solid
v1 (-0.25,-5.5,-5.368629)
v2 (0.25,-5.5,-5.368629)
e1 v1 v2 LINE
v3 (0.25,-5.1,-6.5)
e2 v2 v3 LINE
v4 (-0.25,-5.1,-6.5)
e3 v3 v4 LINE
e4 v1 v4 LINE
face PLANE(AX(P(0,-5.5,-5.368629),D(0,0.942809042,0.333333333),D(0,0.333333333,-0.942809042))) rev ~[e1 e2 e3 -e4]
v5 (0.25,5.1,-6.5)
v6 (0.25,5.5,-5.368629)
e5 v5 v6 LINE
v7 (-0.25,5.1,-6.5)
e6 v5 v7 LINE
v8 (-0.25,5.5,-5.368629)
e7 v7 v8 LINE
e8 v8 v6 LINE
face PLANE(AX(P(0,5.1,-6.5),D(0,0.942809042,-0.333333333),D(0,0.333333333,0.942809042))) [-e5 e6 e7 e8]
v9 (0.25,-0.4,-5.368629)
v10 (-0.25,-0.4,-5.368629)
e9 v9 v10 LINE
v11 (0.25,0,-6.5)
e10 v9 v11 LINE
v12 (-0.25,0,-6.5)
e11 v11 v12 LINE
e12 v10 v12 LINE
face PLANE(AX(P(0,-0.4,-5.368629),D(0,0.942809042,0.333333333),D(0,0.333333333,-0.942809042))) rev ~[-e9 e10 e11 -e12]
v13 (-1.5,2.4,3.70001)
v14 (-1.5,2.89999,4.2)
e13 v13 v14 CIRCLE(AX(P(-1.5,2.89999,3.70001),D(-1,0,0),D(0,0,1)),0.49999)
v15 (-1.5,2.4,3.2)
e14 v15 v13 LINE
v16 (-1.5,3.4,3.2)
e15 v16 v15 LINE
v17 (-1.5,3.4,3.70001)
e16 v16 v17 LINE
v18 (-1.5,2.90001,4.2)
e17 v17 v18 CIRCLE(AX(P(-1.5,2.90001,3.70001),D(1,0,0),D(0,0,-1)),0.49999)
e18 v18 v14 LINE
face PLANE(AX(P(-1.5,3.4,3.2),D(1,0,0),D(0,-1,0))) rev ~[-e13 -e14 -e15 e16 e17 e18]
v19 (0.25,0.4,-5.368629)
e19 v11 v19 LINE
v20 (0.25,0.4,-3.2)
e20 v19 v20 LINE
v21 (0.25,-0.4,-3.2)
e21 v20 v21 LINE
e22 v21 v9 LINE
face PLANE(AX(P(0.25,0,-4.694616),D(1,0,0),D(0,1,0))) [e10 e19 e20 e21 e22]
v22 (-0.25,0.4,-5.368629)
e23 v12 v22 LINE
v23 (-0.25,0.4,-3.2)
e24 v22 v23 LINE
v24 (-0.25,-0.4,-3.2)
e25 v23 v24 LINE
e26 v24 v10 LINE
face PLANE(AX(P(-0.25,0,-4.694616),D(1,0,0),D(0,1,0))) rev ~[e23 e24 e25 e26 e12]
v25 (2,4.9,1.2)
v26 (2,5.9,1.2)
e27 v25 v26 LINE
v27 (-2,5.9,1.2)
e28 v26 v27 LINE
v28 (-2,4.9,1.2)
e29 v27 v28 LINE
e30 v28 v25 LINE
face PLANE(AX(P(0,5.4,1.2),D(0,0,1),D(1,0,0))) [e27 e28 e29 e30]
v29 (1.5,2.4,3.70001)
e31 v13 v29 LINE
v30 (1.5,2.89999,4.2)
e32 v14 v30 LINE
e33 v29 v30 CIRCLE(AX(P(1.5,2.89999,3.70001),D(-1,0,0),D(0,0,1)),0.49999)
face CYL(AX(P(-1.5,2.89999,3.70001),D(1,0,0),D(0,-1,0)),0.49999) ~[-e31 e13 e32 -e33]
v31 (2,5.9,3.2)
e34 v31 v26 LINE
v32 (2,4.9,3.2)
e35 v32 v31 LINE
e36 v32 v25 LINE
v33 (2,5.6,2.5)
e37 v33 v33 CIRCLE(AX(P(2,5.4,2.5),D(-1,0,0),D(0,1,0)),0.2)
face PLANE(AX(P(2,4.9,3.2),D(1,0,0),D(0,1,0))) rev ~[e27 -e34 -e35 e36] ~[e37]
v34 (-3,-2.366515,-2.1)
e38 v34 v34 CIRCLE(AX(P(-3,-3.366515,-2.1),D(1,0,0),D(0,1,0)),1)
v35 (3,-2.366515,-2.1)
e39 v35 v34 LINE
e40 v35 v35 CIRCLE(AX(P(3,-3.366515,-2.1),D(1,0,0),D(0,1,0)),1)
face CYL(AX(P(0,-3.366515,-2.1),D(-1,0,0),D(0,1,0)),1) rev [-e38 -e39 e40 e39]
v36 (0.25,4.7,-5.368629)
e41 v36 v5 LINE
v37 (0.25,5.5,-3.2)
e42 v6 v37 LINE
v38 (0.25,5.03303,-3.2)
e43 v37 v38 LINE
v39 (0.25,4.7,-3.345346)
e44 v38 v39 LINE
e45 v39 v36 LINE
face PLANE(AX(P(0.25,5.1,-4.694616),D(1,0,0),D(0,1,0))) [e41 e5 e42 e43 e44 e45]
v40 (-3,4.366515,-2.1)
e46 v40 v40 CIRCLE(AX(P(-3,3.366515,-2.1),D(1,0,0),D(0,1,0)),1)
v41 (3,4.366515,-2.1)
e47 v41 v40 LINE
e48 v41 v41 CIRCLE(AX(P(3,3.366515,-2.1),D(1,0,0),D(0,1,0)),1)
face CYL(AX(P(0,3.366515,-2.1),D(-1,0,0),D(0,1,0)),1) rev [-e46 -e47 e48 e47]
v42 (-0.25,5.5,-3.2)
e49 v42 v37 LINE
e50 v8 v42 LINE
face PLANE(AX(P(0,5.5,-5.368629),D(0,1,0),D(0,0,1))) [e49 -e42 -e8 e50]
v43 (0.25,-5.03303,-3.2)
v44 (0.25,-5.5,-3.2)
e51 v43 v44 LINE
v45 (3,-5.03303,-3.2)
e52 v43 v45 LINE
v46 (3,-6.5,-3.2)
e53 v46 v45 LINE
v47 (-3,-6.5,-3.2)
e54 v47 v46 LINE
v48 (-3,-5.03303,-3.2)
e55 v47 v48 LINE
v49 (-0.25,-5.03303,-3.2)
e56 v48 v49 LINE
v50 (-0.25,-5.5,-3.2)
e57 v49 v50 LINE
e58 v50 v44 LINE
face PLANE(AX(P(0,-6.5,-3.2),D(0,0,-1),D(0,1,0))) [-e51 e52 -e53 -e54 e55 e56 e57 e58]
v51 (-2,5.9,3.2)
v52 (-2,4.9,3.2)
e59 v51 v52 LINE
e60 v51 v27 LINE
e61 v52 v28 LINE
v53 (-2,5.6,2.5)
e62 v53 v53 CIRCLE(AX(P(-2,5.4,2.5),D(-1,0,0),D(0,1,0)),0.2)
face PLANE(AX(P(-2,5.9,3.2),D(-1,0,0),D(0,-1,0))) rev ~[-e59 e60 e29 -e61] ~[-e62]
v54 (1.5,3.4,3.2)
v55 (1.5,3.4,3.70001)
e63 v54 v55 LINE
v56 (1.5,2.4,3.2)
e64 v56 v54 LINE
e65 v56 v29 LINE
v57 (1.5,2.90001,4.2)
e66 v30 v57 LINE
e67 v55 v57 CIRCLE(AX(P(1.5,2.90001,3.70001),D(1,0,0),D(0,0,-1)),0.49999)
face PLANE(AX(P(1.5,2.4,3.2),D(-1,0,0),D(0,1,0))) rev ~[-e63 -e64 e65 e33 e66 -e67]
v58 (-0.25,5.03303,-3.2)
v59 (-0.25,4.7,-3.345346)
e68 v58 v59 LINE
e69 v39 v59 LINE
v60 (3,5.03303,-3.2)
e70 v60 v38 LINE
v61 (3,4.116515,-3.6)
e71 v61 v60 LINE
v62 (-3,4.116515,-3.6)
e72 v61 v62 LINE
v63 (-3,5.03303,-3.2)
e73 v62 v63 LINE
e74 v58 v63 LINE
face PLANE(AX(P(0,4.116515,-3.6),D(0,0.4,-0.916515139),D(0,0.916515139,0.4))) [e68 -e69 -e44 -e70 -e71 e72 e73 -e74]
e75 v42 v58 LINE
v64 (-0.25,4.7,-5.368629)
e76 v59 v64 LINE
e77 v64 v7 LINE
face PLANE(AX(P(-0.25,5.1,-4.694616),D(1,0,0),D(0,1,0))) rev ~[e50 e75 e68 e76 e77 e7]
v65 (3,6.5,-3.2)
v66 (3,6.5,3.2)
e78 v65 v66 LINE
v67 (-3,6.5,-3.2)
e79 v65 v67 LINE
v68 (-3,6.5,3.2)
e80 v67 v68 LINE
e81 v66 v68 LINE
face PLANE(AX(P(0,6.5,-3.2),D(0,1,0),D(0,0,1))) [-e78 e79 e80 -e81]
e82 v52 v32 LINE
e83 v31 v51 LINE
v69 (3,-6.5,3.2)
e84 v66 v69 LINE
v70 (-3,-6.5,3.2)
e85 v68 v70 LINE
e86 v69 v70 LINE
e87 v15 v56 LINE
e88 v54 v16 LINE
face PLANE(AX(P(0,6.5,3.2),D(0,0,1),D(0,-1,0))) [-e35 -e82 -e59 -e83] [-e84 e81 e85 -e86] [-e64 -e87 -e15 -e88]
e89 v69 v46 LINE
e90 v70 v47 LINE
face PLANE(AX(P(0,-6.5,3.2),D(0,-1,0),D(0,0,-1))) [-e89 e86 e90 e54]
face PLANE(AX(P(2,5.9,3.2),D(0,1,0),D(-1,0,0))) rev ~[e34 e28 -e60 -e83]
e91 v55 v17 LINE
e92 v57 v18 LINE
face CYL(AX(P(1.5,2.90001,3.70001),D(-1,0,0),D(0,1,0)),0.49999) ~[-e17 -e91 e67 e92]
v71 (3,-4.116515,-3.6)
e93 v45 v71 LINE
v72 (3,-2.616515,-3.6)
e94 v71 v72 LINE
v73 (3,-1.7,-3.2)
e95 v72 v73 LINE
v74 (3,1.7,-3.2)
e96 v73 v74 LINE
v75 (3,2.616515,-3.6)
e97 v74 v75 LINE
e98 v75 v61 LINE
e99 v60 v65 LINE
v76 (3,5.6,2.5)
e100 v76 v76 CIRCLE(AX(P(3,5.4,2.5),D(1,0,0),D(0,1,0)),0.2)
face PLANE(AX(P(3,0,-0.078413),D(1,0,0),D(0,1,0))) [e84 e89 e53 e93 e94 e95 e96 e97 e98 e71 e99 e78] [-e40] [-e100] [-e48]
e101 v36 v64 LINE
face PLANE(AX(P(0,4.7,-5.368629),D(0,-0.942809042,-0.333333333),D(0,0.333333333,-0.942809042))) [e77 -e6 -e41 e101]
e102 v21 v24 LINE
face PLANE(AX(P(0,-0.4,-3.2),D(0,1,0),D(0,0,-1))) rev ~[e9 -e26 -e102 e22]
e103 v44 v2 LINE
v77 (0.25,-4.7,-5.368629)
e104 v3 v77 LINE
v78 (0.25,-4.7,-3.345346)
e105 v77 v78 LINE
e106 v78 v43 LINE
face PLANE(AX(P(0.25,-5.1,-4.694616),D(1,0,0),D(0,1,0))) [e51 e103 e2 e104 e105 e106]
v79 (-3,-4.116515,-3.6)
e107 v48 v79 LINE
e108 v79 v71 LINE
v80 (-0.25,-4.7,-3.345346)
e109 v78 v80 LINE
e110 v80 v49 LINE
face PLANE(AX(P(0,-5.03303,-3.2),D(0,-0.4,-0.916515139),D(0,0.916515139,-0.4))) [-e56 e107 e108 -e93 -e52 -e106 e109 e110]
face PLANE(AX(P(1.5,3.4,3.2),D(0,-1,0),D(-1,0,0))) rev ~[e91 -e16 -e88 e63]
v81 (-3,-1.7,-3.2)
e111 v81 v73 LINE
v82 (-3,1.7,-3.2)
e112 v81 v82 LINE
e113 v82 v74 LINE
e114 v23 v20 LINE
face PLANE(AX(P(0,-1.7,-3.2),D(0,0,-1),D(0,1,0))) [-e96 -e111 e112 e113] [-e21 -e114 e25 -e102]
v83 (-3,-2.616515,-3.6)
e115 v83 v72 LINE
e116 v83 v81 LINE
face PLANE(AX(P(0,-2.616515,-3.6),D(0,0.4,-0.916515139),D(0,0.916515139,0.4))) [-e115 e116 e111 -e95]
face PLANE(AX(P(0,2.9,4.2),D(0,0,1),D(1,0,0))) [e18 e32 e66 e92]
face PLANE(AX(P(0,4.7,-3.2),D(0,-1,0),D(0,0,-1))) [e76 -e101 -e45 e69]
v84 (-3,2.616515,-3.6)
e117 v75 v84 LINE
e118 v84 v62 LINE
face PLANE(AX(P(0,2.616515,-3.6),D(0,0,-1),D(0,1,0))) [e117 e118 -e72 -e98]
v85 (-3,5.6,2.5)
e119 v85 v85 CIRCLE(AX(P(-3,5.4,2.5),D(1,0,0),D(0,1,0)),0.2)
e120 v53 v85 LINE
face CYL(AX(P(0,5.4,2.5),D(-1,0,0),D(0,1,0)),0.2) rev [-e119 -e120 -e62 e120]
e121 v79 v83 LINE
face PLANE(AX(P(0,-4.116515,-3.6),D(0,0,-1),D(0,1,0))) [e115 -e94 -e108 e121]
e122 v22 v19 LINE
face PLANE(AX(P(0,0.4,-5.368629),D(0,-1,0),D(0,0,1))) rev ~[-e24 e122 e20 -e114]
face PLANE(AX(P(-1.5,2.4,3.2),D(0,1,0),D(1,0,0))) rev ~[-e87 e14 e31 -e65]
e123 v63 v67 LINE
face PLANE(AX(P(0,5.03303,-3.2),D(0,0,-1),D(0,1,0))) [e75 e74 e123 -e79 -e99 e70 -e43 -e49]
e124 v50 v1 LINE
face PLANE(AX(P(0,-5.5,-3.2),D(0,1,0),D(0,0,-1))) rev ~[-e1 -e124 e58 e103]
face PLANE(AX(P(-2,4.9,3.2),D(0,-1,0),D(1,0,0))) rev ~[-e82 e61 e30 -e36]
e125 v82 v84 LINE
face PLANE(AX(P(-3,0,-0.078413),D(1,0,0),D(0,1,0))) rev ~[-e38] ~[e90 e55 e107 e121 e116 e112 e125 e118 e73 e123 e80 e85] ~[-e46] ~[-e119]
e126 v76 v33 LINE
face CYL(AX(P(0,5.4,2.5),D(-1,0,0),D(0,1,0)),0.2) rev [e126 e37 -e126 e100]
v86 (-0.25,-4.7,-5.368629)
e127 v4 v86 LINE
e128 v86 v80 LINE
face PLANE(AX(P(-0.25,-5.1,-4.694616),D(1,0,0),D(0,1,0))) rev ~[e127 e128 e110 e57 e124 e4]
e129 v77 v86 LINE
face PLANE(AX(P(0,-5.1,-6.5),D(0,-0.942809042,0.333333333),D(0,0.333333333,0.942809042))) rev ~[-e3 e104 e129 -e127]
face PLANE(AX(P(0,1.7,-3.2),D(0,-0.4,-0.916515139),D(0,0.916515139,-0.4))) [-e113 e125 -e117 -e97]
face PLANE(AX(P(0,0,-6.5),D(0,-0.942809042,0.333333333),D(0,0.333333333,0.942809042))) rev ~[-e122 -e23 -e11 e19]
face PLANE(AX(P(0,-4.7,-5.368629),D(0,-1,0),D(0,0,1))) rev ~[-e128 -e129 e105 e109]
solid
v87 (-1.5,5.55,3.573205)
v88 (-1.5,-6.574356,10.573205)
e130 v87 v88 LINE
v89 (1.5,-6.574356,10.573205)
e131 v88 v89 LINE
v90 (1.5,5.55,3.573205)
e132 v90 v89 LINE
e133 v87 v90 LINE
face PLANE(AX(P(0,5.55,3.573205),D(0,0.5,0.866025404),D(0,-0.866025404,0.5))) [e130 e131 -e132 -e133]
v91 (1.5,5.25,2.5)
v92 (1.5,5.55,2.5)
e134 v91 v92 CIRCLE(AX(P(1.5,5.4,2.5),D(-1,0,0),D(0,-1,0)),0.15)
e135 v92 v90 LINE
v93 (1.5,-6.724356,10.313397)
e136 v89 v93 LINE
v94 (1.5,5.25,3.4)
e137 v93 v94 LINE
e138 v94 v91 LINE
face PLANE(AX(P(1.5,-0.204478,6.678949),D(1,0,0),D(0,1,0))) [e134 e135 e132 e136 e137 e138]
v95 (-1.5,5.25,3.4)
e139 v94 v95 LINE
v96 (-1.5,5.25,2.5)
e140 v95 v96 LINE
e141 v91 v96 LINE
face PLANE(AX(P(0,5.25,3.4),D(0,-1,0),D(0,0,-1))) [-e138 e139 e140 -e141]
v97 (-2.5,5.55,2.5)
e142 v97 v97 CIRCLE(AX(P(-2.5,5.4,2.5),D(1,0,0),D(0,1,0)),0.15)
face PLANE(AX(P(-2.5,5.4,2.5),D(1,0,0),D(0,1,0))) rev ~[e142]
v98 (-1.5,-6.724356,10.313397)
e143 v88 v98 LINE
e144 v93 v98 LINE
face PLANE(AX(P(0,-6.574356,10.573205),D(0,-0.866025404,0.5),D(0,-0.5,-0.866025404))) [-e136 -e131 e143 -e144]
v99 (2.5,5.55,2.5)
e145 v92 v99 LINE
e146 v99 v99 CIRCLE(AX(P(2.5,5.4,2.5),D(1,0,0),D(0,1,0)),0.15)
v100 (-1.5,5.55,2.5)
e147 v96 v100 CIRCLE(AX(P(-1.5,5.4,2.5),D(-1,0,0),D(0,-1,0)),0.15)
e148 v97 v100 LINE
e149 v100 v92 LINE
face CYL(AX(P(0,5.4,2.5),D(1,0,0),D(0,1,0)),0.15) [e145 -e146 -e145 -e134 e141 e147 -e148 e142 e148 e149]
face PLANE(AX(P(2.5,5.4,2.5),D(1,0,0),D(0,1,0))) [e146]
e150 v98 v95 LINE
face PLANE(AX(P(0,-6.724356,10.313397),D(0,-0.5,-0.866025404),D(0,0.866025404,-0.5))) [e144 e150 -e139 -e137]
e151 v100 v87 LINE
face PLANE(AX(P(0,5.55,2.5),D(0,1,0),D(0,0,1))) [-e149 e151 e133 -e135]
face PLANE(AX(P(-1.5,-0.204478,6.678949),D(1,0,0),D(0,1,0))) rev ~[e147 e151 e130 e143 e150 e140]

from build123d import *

# Parameters (mm, degrees)
F0_R      = 1
F0_R_2    = 0.2
F1_DEPTH  = 3
F3_DEPTH  = 0.25
F5_DEPTH  = 2
F6_DEPTH  = 1
F7_R      = 0.49999
F9_DEPTH  = 1.5
F10_DEPTH = 2.5


# Not quite as in the source:
# - a fillet or chamfer is up to 0.001 mm smaller than in the source, because OpenCascade refuses the exact size


with BuildPart() as f1:
    # F0 (on Right) → F1 (new body, symmetric)
    with BuildSketch(Plane.YZ):
        Polygon((0, 3.2), (-6.5, 3.2), (-6.5, -3.2), (-5.033030278, -3.2), (-4.116515139, -3.6), (-2.616515139, -3.6), (-1.7, -3.2), (0, -3.2), (1.7, -3.2), (2.616515139, -3.6), (4.116515139, -3.6), (5.033030278, -3.2), (6.5, -3.2), (6.5, 3.2), align=None)
        with Locations((-3.366515139, -2.1)):
            Circle(F0_R, mode=Mode.SUBTRACT)
        with Locations((3.366515139, -2.1)):
            Circle(F0_R, mode=Mode.SUBTRACT)
        with Locations((5.4, 2.5)):
            Circle(F0_R_2, mode=Mode.SUBTRACT)
    extrude(amount=F1_DEPTH, both=True)

    # F2 (on Right) → F3 (join, symmetric)
    with BuildSketch(Plane.YZ):
        Polygon((-4.7, -3.2), (-5.5, -3.2), (-5.5, -5.3686291501), (-5.1, -6.5), (-4.7, -5.3686291501), align=None)
        Polygon((0, -6.5), (0.4, -5.3686291501), (0.4, -3.2), (-0.4, -3.2), (-0.4, -5.3686291501), align=None)
        Polygon((5.1, -6.5), (5.5, -5.3686291501), (5.5, -3.2), (4.7, -3.2), (4.7, -5.3686291501), align=None)
    extrude(amount=F3_DEPTH, both=True)

    # F4 (on face) → F5 (cut)
    with BuildSketch(Plane.XY.offset(3.2)):
        Polygon((2, 5.9), (0, 5.9), (-2, 5.9), (-2, 4.9), (0, 4.9), (2, 4.9), align=None)
    extrude(amount=-F5_DEPTH, mode=Mode.SUBTRACT)

    # F4 (on face) → F6 (join)
    with BuildSketch(Plane.XY.offset(3.2)):
        Polygon((1.5, 3.4), (0, 3.4), (-1.5, 3.4), (-1.5, 2.4), (0, 2.4), (1.5, 2.4), align=None)
    extrude(amount=F6_DEPTH)

    # F7 (radius 0.5 in the source; OpenCascade refuses exactly that, so slightly less here)
    f7_edges = [f1.edges().sort_by_distance(p)[0] for p in [
        (0, 3.4, 4.2),
        (0, 2.4, 4.2),
    ]]
    fillet(f7_edges, radius=F7_R)


with BuildPart() as f9:
    # F8 (on Right) → F9 (new body, symmetric)
    with BuildSketch(Plane.YZ):
        with BuildLine():
            ThreePointArc((5.25, 2.5), (5.4, 2.65), (5.55, 2.5))
            Line((5.55, 2.5), (5.55, 3.5732050808))
            Line((5.55, 3.5732050808), (-6.574355653, 10.5732050808))
            Line((-6.574355653, 10.5732050808), (-6.724355653, 10.3133974596))
            Line((-6.724355653, 10.3133974596), (5.25, 3.4))
            Line((5.25, 3.4), (5.25, 2.5))
        make_face()
    extrude(amount=F9_DEPTH, both=True)

    # F8 (on Right) → F10 (join, symmetric)
    with BuildSketch(Plane.YZ):
        with BuildLine():
            ThreePointArc((5.25, 2.5), (5.4, 2.35), (5.55, 2.5))
            ThreePointArc((5.55, 2.5), (5.4, 2.65), (5.25, 2.5))
        make_face()
    extrude(amount=F10_DEPTH, both=True)


solid = Compound([f1.part, f9.part])
